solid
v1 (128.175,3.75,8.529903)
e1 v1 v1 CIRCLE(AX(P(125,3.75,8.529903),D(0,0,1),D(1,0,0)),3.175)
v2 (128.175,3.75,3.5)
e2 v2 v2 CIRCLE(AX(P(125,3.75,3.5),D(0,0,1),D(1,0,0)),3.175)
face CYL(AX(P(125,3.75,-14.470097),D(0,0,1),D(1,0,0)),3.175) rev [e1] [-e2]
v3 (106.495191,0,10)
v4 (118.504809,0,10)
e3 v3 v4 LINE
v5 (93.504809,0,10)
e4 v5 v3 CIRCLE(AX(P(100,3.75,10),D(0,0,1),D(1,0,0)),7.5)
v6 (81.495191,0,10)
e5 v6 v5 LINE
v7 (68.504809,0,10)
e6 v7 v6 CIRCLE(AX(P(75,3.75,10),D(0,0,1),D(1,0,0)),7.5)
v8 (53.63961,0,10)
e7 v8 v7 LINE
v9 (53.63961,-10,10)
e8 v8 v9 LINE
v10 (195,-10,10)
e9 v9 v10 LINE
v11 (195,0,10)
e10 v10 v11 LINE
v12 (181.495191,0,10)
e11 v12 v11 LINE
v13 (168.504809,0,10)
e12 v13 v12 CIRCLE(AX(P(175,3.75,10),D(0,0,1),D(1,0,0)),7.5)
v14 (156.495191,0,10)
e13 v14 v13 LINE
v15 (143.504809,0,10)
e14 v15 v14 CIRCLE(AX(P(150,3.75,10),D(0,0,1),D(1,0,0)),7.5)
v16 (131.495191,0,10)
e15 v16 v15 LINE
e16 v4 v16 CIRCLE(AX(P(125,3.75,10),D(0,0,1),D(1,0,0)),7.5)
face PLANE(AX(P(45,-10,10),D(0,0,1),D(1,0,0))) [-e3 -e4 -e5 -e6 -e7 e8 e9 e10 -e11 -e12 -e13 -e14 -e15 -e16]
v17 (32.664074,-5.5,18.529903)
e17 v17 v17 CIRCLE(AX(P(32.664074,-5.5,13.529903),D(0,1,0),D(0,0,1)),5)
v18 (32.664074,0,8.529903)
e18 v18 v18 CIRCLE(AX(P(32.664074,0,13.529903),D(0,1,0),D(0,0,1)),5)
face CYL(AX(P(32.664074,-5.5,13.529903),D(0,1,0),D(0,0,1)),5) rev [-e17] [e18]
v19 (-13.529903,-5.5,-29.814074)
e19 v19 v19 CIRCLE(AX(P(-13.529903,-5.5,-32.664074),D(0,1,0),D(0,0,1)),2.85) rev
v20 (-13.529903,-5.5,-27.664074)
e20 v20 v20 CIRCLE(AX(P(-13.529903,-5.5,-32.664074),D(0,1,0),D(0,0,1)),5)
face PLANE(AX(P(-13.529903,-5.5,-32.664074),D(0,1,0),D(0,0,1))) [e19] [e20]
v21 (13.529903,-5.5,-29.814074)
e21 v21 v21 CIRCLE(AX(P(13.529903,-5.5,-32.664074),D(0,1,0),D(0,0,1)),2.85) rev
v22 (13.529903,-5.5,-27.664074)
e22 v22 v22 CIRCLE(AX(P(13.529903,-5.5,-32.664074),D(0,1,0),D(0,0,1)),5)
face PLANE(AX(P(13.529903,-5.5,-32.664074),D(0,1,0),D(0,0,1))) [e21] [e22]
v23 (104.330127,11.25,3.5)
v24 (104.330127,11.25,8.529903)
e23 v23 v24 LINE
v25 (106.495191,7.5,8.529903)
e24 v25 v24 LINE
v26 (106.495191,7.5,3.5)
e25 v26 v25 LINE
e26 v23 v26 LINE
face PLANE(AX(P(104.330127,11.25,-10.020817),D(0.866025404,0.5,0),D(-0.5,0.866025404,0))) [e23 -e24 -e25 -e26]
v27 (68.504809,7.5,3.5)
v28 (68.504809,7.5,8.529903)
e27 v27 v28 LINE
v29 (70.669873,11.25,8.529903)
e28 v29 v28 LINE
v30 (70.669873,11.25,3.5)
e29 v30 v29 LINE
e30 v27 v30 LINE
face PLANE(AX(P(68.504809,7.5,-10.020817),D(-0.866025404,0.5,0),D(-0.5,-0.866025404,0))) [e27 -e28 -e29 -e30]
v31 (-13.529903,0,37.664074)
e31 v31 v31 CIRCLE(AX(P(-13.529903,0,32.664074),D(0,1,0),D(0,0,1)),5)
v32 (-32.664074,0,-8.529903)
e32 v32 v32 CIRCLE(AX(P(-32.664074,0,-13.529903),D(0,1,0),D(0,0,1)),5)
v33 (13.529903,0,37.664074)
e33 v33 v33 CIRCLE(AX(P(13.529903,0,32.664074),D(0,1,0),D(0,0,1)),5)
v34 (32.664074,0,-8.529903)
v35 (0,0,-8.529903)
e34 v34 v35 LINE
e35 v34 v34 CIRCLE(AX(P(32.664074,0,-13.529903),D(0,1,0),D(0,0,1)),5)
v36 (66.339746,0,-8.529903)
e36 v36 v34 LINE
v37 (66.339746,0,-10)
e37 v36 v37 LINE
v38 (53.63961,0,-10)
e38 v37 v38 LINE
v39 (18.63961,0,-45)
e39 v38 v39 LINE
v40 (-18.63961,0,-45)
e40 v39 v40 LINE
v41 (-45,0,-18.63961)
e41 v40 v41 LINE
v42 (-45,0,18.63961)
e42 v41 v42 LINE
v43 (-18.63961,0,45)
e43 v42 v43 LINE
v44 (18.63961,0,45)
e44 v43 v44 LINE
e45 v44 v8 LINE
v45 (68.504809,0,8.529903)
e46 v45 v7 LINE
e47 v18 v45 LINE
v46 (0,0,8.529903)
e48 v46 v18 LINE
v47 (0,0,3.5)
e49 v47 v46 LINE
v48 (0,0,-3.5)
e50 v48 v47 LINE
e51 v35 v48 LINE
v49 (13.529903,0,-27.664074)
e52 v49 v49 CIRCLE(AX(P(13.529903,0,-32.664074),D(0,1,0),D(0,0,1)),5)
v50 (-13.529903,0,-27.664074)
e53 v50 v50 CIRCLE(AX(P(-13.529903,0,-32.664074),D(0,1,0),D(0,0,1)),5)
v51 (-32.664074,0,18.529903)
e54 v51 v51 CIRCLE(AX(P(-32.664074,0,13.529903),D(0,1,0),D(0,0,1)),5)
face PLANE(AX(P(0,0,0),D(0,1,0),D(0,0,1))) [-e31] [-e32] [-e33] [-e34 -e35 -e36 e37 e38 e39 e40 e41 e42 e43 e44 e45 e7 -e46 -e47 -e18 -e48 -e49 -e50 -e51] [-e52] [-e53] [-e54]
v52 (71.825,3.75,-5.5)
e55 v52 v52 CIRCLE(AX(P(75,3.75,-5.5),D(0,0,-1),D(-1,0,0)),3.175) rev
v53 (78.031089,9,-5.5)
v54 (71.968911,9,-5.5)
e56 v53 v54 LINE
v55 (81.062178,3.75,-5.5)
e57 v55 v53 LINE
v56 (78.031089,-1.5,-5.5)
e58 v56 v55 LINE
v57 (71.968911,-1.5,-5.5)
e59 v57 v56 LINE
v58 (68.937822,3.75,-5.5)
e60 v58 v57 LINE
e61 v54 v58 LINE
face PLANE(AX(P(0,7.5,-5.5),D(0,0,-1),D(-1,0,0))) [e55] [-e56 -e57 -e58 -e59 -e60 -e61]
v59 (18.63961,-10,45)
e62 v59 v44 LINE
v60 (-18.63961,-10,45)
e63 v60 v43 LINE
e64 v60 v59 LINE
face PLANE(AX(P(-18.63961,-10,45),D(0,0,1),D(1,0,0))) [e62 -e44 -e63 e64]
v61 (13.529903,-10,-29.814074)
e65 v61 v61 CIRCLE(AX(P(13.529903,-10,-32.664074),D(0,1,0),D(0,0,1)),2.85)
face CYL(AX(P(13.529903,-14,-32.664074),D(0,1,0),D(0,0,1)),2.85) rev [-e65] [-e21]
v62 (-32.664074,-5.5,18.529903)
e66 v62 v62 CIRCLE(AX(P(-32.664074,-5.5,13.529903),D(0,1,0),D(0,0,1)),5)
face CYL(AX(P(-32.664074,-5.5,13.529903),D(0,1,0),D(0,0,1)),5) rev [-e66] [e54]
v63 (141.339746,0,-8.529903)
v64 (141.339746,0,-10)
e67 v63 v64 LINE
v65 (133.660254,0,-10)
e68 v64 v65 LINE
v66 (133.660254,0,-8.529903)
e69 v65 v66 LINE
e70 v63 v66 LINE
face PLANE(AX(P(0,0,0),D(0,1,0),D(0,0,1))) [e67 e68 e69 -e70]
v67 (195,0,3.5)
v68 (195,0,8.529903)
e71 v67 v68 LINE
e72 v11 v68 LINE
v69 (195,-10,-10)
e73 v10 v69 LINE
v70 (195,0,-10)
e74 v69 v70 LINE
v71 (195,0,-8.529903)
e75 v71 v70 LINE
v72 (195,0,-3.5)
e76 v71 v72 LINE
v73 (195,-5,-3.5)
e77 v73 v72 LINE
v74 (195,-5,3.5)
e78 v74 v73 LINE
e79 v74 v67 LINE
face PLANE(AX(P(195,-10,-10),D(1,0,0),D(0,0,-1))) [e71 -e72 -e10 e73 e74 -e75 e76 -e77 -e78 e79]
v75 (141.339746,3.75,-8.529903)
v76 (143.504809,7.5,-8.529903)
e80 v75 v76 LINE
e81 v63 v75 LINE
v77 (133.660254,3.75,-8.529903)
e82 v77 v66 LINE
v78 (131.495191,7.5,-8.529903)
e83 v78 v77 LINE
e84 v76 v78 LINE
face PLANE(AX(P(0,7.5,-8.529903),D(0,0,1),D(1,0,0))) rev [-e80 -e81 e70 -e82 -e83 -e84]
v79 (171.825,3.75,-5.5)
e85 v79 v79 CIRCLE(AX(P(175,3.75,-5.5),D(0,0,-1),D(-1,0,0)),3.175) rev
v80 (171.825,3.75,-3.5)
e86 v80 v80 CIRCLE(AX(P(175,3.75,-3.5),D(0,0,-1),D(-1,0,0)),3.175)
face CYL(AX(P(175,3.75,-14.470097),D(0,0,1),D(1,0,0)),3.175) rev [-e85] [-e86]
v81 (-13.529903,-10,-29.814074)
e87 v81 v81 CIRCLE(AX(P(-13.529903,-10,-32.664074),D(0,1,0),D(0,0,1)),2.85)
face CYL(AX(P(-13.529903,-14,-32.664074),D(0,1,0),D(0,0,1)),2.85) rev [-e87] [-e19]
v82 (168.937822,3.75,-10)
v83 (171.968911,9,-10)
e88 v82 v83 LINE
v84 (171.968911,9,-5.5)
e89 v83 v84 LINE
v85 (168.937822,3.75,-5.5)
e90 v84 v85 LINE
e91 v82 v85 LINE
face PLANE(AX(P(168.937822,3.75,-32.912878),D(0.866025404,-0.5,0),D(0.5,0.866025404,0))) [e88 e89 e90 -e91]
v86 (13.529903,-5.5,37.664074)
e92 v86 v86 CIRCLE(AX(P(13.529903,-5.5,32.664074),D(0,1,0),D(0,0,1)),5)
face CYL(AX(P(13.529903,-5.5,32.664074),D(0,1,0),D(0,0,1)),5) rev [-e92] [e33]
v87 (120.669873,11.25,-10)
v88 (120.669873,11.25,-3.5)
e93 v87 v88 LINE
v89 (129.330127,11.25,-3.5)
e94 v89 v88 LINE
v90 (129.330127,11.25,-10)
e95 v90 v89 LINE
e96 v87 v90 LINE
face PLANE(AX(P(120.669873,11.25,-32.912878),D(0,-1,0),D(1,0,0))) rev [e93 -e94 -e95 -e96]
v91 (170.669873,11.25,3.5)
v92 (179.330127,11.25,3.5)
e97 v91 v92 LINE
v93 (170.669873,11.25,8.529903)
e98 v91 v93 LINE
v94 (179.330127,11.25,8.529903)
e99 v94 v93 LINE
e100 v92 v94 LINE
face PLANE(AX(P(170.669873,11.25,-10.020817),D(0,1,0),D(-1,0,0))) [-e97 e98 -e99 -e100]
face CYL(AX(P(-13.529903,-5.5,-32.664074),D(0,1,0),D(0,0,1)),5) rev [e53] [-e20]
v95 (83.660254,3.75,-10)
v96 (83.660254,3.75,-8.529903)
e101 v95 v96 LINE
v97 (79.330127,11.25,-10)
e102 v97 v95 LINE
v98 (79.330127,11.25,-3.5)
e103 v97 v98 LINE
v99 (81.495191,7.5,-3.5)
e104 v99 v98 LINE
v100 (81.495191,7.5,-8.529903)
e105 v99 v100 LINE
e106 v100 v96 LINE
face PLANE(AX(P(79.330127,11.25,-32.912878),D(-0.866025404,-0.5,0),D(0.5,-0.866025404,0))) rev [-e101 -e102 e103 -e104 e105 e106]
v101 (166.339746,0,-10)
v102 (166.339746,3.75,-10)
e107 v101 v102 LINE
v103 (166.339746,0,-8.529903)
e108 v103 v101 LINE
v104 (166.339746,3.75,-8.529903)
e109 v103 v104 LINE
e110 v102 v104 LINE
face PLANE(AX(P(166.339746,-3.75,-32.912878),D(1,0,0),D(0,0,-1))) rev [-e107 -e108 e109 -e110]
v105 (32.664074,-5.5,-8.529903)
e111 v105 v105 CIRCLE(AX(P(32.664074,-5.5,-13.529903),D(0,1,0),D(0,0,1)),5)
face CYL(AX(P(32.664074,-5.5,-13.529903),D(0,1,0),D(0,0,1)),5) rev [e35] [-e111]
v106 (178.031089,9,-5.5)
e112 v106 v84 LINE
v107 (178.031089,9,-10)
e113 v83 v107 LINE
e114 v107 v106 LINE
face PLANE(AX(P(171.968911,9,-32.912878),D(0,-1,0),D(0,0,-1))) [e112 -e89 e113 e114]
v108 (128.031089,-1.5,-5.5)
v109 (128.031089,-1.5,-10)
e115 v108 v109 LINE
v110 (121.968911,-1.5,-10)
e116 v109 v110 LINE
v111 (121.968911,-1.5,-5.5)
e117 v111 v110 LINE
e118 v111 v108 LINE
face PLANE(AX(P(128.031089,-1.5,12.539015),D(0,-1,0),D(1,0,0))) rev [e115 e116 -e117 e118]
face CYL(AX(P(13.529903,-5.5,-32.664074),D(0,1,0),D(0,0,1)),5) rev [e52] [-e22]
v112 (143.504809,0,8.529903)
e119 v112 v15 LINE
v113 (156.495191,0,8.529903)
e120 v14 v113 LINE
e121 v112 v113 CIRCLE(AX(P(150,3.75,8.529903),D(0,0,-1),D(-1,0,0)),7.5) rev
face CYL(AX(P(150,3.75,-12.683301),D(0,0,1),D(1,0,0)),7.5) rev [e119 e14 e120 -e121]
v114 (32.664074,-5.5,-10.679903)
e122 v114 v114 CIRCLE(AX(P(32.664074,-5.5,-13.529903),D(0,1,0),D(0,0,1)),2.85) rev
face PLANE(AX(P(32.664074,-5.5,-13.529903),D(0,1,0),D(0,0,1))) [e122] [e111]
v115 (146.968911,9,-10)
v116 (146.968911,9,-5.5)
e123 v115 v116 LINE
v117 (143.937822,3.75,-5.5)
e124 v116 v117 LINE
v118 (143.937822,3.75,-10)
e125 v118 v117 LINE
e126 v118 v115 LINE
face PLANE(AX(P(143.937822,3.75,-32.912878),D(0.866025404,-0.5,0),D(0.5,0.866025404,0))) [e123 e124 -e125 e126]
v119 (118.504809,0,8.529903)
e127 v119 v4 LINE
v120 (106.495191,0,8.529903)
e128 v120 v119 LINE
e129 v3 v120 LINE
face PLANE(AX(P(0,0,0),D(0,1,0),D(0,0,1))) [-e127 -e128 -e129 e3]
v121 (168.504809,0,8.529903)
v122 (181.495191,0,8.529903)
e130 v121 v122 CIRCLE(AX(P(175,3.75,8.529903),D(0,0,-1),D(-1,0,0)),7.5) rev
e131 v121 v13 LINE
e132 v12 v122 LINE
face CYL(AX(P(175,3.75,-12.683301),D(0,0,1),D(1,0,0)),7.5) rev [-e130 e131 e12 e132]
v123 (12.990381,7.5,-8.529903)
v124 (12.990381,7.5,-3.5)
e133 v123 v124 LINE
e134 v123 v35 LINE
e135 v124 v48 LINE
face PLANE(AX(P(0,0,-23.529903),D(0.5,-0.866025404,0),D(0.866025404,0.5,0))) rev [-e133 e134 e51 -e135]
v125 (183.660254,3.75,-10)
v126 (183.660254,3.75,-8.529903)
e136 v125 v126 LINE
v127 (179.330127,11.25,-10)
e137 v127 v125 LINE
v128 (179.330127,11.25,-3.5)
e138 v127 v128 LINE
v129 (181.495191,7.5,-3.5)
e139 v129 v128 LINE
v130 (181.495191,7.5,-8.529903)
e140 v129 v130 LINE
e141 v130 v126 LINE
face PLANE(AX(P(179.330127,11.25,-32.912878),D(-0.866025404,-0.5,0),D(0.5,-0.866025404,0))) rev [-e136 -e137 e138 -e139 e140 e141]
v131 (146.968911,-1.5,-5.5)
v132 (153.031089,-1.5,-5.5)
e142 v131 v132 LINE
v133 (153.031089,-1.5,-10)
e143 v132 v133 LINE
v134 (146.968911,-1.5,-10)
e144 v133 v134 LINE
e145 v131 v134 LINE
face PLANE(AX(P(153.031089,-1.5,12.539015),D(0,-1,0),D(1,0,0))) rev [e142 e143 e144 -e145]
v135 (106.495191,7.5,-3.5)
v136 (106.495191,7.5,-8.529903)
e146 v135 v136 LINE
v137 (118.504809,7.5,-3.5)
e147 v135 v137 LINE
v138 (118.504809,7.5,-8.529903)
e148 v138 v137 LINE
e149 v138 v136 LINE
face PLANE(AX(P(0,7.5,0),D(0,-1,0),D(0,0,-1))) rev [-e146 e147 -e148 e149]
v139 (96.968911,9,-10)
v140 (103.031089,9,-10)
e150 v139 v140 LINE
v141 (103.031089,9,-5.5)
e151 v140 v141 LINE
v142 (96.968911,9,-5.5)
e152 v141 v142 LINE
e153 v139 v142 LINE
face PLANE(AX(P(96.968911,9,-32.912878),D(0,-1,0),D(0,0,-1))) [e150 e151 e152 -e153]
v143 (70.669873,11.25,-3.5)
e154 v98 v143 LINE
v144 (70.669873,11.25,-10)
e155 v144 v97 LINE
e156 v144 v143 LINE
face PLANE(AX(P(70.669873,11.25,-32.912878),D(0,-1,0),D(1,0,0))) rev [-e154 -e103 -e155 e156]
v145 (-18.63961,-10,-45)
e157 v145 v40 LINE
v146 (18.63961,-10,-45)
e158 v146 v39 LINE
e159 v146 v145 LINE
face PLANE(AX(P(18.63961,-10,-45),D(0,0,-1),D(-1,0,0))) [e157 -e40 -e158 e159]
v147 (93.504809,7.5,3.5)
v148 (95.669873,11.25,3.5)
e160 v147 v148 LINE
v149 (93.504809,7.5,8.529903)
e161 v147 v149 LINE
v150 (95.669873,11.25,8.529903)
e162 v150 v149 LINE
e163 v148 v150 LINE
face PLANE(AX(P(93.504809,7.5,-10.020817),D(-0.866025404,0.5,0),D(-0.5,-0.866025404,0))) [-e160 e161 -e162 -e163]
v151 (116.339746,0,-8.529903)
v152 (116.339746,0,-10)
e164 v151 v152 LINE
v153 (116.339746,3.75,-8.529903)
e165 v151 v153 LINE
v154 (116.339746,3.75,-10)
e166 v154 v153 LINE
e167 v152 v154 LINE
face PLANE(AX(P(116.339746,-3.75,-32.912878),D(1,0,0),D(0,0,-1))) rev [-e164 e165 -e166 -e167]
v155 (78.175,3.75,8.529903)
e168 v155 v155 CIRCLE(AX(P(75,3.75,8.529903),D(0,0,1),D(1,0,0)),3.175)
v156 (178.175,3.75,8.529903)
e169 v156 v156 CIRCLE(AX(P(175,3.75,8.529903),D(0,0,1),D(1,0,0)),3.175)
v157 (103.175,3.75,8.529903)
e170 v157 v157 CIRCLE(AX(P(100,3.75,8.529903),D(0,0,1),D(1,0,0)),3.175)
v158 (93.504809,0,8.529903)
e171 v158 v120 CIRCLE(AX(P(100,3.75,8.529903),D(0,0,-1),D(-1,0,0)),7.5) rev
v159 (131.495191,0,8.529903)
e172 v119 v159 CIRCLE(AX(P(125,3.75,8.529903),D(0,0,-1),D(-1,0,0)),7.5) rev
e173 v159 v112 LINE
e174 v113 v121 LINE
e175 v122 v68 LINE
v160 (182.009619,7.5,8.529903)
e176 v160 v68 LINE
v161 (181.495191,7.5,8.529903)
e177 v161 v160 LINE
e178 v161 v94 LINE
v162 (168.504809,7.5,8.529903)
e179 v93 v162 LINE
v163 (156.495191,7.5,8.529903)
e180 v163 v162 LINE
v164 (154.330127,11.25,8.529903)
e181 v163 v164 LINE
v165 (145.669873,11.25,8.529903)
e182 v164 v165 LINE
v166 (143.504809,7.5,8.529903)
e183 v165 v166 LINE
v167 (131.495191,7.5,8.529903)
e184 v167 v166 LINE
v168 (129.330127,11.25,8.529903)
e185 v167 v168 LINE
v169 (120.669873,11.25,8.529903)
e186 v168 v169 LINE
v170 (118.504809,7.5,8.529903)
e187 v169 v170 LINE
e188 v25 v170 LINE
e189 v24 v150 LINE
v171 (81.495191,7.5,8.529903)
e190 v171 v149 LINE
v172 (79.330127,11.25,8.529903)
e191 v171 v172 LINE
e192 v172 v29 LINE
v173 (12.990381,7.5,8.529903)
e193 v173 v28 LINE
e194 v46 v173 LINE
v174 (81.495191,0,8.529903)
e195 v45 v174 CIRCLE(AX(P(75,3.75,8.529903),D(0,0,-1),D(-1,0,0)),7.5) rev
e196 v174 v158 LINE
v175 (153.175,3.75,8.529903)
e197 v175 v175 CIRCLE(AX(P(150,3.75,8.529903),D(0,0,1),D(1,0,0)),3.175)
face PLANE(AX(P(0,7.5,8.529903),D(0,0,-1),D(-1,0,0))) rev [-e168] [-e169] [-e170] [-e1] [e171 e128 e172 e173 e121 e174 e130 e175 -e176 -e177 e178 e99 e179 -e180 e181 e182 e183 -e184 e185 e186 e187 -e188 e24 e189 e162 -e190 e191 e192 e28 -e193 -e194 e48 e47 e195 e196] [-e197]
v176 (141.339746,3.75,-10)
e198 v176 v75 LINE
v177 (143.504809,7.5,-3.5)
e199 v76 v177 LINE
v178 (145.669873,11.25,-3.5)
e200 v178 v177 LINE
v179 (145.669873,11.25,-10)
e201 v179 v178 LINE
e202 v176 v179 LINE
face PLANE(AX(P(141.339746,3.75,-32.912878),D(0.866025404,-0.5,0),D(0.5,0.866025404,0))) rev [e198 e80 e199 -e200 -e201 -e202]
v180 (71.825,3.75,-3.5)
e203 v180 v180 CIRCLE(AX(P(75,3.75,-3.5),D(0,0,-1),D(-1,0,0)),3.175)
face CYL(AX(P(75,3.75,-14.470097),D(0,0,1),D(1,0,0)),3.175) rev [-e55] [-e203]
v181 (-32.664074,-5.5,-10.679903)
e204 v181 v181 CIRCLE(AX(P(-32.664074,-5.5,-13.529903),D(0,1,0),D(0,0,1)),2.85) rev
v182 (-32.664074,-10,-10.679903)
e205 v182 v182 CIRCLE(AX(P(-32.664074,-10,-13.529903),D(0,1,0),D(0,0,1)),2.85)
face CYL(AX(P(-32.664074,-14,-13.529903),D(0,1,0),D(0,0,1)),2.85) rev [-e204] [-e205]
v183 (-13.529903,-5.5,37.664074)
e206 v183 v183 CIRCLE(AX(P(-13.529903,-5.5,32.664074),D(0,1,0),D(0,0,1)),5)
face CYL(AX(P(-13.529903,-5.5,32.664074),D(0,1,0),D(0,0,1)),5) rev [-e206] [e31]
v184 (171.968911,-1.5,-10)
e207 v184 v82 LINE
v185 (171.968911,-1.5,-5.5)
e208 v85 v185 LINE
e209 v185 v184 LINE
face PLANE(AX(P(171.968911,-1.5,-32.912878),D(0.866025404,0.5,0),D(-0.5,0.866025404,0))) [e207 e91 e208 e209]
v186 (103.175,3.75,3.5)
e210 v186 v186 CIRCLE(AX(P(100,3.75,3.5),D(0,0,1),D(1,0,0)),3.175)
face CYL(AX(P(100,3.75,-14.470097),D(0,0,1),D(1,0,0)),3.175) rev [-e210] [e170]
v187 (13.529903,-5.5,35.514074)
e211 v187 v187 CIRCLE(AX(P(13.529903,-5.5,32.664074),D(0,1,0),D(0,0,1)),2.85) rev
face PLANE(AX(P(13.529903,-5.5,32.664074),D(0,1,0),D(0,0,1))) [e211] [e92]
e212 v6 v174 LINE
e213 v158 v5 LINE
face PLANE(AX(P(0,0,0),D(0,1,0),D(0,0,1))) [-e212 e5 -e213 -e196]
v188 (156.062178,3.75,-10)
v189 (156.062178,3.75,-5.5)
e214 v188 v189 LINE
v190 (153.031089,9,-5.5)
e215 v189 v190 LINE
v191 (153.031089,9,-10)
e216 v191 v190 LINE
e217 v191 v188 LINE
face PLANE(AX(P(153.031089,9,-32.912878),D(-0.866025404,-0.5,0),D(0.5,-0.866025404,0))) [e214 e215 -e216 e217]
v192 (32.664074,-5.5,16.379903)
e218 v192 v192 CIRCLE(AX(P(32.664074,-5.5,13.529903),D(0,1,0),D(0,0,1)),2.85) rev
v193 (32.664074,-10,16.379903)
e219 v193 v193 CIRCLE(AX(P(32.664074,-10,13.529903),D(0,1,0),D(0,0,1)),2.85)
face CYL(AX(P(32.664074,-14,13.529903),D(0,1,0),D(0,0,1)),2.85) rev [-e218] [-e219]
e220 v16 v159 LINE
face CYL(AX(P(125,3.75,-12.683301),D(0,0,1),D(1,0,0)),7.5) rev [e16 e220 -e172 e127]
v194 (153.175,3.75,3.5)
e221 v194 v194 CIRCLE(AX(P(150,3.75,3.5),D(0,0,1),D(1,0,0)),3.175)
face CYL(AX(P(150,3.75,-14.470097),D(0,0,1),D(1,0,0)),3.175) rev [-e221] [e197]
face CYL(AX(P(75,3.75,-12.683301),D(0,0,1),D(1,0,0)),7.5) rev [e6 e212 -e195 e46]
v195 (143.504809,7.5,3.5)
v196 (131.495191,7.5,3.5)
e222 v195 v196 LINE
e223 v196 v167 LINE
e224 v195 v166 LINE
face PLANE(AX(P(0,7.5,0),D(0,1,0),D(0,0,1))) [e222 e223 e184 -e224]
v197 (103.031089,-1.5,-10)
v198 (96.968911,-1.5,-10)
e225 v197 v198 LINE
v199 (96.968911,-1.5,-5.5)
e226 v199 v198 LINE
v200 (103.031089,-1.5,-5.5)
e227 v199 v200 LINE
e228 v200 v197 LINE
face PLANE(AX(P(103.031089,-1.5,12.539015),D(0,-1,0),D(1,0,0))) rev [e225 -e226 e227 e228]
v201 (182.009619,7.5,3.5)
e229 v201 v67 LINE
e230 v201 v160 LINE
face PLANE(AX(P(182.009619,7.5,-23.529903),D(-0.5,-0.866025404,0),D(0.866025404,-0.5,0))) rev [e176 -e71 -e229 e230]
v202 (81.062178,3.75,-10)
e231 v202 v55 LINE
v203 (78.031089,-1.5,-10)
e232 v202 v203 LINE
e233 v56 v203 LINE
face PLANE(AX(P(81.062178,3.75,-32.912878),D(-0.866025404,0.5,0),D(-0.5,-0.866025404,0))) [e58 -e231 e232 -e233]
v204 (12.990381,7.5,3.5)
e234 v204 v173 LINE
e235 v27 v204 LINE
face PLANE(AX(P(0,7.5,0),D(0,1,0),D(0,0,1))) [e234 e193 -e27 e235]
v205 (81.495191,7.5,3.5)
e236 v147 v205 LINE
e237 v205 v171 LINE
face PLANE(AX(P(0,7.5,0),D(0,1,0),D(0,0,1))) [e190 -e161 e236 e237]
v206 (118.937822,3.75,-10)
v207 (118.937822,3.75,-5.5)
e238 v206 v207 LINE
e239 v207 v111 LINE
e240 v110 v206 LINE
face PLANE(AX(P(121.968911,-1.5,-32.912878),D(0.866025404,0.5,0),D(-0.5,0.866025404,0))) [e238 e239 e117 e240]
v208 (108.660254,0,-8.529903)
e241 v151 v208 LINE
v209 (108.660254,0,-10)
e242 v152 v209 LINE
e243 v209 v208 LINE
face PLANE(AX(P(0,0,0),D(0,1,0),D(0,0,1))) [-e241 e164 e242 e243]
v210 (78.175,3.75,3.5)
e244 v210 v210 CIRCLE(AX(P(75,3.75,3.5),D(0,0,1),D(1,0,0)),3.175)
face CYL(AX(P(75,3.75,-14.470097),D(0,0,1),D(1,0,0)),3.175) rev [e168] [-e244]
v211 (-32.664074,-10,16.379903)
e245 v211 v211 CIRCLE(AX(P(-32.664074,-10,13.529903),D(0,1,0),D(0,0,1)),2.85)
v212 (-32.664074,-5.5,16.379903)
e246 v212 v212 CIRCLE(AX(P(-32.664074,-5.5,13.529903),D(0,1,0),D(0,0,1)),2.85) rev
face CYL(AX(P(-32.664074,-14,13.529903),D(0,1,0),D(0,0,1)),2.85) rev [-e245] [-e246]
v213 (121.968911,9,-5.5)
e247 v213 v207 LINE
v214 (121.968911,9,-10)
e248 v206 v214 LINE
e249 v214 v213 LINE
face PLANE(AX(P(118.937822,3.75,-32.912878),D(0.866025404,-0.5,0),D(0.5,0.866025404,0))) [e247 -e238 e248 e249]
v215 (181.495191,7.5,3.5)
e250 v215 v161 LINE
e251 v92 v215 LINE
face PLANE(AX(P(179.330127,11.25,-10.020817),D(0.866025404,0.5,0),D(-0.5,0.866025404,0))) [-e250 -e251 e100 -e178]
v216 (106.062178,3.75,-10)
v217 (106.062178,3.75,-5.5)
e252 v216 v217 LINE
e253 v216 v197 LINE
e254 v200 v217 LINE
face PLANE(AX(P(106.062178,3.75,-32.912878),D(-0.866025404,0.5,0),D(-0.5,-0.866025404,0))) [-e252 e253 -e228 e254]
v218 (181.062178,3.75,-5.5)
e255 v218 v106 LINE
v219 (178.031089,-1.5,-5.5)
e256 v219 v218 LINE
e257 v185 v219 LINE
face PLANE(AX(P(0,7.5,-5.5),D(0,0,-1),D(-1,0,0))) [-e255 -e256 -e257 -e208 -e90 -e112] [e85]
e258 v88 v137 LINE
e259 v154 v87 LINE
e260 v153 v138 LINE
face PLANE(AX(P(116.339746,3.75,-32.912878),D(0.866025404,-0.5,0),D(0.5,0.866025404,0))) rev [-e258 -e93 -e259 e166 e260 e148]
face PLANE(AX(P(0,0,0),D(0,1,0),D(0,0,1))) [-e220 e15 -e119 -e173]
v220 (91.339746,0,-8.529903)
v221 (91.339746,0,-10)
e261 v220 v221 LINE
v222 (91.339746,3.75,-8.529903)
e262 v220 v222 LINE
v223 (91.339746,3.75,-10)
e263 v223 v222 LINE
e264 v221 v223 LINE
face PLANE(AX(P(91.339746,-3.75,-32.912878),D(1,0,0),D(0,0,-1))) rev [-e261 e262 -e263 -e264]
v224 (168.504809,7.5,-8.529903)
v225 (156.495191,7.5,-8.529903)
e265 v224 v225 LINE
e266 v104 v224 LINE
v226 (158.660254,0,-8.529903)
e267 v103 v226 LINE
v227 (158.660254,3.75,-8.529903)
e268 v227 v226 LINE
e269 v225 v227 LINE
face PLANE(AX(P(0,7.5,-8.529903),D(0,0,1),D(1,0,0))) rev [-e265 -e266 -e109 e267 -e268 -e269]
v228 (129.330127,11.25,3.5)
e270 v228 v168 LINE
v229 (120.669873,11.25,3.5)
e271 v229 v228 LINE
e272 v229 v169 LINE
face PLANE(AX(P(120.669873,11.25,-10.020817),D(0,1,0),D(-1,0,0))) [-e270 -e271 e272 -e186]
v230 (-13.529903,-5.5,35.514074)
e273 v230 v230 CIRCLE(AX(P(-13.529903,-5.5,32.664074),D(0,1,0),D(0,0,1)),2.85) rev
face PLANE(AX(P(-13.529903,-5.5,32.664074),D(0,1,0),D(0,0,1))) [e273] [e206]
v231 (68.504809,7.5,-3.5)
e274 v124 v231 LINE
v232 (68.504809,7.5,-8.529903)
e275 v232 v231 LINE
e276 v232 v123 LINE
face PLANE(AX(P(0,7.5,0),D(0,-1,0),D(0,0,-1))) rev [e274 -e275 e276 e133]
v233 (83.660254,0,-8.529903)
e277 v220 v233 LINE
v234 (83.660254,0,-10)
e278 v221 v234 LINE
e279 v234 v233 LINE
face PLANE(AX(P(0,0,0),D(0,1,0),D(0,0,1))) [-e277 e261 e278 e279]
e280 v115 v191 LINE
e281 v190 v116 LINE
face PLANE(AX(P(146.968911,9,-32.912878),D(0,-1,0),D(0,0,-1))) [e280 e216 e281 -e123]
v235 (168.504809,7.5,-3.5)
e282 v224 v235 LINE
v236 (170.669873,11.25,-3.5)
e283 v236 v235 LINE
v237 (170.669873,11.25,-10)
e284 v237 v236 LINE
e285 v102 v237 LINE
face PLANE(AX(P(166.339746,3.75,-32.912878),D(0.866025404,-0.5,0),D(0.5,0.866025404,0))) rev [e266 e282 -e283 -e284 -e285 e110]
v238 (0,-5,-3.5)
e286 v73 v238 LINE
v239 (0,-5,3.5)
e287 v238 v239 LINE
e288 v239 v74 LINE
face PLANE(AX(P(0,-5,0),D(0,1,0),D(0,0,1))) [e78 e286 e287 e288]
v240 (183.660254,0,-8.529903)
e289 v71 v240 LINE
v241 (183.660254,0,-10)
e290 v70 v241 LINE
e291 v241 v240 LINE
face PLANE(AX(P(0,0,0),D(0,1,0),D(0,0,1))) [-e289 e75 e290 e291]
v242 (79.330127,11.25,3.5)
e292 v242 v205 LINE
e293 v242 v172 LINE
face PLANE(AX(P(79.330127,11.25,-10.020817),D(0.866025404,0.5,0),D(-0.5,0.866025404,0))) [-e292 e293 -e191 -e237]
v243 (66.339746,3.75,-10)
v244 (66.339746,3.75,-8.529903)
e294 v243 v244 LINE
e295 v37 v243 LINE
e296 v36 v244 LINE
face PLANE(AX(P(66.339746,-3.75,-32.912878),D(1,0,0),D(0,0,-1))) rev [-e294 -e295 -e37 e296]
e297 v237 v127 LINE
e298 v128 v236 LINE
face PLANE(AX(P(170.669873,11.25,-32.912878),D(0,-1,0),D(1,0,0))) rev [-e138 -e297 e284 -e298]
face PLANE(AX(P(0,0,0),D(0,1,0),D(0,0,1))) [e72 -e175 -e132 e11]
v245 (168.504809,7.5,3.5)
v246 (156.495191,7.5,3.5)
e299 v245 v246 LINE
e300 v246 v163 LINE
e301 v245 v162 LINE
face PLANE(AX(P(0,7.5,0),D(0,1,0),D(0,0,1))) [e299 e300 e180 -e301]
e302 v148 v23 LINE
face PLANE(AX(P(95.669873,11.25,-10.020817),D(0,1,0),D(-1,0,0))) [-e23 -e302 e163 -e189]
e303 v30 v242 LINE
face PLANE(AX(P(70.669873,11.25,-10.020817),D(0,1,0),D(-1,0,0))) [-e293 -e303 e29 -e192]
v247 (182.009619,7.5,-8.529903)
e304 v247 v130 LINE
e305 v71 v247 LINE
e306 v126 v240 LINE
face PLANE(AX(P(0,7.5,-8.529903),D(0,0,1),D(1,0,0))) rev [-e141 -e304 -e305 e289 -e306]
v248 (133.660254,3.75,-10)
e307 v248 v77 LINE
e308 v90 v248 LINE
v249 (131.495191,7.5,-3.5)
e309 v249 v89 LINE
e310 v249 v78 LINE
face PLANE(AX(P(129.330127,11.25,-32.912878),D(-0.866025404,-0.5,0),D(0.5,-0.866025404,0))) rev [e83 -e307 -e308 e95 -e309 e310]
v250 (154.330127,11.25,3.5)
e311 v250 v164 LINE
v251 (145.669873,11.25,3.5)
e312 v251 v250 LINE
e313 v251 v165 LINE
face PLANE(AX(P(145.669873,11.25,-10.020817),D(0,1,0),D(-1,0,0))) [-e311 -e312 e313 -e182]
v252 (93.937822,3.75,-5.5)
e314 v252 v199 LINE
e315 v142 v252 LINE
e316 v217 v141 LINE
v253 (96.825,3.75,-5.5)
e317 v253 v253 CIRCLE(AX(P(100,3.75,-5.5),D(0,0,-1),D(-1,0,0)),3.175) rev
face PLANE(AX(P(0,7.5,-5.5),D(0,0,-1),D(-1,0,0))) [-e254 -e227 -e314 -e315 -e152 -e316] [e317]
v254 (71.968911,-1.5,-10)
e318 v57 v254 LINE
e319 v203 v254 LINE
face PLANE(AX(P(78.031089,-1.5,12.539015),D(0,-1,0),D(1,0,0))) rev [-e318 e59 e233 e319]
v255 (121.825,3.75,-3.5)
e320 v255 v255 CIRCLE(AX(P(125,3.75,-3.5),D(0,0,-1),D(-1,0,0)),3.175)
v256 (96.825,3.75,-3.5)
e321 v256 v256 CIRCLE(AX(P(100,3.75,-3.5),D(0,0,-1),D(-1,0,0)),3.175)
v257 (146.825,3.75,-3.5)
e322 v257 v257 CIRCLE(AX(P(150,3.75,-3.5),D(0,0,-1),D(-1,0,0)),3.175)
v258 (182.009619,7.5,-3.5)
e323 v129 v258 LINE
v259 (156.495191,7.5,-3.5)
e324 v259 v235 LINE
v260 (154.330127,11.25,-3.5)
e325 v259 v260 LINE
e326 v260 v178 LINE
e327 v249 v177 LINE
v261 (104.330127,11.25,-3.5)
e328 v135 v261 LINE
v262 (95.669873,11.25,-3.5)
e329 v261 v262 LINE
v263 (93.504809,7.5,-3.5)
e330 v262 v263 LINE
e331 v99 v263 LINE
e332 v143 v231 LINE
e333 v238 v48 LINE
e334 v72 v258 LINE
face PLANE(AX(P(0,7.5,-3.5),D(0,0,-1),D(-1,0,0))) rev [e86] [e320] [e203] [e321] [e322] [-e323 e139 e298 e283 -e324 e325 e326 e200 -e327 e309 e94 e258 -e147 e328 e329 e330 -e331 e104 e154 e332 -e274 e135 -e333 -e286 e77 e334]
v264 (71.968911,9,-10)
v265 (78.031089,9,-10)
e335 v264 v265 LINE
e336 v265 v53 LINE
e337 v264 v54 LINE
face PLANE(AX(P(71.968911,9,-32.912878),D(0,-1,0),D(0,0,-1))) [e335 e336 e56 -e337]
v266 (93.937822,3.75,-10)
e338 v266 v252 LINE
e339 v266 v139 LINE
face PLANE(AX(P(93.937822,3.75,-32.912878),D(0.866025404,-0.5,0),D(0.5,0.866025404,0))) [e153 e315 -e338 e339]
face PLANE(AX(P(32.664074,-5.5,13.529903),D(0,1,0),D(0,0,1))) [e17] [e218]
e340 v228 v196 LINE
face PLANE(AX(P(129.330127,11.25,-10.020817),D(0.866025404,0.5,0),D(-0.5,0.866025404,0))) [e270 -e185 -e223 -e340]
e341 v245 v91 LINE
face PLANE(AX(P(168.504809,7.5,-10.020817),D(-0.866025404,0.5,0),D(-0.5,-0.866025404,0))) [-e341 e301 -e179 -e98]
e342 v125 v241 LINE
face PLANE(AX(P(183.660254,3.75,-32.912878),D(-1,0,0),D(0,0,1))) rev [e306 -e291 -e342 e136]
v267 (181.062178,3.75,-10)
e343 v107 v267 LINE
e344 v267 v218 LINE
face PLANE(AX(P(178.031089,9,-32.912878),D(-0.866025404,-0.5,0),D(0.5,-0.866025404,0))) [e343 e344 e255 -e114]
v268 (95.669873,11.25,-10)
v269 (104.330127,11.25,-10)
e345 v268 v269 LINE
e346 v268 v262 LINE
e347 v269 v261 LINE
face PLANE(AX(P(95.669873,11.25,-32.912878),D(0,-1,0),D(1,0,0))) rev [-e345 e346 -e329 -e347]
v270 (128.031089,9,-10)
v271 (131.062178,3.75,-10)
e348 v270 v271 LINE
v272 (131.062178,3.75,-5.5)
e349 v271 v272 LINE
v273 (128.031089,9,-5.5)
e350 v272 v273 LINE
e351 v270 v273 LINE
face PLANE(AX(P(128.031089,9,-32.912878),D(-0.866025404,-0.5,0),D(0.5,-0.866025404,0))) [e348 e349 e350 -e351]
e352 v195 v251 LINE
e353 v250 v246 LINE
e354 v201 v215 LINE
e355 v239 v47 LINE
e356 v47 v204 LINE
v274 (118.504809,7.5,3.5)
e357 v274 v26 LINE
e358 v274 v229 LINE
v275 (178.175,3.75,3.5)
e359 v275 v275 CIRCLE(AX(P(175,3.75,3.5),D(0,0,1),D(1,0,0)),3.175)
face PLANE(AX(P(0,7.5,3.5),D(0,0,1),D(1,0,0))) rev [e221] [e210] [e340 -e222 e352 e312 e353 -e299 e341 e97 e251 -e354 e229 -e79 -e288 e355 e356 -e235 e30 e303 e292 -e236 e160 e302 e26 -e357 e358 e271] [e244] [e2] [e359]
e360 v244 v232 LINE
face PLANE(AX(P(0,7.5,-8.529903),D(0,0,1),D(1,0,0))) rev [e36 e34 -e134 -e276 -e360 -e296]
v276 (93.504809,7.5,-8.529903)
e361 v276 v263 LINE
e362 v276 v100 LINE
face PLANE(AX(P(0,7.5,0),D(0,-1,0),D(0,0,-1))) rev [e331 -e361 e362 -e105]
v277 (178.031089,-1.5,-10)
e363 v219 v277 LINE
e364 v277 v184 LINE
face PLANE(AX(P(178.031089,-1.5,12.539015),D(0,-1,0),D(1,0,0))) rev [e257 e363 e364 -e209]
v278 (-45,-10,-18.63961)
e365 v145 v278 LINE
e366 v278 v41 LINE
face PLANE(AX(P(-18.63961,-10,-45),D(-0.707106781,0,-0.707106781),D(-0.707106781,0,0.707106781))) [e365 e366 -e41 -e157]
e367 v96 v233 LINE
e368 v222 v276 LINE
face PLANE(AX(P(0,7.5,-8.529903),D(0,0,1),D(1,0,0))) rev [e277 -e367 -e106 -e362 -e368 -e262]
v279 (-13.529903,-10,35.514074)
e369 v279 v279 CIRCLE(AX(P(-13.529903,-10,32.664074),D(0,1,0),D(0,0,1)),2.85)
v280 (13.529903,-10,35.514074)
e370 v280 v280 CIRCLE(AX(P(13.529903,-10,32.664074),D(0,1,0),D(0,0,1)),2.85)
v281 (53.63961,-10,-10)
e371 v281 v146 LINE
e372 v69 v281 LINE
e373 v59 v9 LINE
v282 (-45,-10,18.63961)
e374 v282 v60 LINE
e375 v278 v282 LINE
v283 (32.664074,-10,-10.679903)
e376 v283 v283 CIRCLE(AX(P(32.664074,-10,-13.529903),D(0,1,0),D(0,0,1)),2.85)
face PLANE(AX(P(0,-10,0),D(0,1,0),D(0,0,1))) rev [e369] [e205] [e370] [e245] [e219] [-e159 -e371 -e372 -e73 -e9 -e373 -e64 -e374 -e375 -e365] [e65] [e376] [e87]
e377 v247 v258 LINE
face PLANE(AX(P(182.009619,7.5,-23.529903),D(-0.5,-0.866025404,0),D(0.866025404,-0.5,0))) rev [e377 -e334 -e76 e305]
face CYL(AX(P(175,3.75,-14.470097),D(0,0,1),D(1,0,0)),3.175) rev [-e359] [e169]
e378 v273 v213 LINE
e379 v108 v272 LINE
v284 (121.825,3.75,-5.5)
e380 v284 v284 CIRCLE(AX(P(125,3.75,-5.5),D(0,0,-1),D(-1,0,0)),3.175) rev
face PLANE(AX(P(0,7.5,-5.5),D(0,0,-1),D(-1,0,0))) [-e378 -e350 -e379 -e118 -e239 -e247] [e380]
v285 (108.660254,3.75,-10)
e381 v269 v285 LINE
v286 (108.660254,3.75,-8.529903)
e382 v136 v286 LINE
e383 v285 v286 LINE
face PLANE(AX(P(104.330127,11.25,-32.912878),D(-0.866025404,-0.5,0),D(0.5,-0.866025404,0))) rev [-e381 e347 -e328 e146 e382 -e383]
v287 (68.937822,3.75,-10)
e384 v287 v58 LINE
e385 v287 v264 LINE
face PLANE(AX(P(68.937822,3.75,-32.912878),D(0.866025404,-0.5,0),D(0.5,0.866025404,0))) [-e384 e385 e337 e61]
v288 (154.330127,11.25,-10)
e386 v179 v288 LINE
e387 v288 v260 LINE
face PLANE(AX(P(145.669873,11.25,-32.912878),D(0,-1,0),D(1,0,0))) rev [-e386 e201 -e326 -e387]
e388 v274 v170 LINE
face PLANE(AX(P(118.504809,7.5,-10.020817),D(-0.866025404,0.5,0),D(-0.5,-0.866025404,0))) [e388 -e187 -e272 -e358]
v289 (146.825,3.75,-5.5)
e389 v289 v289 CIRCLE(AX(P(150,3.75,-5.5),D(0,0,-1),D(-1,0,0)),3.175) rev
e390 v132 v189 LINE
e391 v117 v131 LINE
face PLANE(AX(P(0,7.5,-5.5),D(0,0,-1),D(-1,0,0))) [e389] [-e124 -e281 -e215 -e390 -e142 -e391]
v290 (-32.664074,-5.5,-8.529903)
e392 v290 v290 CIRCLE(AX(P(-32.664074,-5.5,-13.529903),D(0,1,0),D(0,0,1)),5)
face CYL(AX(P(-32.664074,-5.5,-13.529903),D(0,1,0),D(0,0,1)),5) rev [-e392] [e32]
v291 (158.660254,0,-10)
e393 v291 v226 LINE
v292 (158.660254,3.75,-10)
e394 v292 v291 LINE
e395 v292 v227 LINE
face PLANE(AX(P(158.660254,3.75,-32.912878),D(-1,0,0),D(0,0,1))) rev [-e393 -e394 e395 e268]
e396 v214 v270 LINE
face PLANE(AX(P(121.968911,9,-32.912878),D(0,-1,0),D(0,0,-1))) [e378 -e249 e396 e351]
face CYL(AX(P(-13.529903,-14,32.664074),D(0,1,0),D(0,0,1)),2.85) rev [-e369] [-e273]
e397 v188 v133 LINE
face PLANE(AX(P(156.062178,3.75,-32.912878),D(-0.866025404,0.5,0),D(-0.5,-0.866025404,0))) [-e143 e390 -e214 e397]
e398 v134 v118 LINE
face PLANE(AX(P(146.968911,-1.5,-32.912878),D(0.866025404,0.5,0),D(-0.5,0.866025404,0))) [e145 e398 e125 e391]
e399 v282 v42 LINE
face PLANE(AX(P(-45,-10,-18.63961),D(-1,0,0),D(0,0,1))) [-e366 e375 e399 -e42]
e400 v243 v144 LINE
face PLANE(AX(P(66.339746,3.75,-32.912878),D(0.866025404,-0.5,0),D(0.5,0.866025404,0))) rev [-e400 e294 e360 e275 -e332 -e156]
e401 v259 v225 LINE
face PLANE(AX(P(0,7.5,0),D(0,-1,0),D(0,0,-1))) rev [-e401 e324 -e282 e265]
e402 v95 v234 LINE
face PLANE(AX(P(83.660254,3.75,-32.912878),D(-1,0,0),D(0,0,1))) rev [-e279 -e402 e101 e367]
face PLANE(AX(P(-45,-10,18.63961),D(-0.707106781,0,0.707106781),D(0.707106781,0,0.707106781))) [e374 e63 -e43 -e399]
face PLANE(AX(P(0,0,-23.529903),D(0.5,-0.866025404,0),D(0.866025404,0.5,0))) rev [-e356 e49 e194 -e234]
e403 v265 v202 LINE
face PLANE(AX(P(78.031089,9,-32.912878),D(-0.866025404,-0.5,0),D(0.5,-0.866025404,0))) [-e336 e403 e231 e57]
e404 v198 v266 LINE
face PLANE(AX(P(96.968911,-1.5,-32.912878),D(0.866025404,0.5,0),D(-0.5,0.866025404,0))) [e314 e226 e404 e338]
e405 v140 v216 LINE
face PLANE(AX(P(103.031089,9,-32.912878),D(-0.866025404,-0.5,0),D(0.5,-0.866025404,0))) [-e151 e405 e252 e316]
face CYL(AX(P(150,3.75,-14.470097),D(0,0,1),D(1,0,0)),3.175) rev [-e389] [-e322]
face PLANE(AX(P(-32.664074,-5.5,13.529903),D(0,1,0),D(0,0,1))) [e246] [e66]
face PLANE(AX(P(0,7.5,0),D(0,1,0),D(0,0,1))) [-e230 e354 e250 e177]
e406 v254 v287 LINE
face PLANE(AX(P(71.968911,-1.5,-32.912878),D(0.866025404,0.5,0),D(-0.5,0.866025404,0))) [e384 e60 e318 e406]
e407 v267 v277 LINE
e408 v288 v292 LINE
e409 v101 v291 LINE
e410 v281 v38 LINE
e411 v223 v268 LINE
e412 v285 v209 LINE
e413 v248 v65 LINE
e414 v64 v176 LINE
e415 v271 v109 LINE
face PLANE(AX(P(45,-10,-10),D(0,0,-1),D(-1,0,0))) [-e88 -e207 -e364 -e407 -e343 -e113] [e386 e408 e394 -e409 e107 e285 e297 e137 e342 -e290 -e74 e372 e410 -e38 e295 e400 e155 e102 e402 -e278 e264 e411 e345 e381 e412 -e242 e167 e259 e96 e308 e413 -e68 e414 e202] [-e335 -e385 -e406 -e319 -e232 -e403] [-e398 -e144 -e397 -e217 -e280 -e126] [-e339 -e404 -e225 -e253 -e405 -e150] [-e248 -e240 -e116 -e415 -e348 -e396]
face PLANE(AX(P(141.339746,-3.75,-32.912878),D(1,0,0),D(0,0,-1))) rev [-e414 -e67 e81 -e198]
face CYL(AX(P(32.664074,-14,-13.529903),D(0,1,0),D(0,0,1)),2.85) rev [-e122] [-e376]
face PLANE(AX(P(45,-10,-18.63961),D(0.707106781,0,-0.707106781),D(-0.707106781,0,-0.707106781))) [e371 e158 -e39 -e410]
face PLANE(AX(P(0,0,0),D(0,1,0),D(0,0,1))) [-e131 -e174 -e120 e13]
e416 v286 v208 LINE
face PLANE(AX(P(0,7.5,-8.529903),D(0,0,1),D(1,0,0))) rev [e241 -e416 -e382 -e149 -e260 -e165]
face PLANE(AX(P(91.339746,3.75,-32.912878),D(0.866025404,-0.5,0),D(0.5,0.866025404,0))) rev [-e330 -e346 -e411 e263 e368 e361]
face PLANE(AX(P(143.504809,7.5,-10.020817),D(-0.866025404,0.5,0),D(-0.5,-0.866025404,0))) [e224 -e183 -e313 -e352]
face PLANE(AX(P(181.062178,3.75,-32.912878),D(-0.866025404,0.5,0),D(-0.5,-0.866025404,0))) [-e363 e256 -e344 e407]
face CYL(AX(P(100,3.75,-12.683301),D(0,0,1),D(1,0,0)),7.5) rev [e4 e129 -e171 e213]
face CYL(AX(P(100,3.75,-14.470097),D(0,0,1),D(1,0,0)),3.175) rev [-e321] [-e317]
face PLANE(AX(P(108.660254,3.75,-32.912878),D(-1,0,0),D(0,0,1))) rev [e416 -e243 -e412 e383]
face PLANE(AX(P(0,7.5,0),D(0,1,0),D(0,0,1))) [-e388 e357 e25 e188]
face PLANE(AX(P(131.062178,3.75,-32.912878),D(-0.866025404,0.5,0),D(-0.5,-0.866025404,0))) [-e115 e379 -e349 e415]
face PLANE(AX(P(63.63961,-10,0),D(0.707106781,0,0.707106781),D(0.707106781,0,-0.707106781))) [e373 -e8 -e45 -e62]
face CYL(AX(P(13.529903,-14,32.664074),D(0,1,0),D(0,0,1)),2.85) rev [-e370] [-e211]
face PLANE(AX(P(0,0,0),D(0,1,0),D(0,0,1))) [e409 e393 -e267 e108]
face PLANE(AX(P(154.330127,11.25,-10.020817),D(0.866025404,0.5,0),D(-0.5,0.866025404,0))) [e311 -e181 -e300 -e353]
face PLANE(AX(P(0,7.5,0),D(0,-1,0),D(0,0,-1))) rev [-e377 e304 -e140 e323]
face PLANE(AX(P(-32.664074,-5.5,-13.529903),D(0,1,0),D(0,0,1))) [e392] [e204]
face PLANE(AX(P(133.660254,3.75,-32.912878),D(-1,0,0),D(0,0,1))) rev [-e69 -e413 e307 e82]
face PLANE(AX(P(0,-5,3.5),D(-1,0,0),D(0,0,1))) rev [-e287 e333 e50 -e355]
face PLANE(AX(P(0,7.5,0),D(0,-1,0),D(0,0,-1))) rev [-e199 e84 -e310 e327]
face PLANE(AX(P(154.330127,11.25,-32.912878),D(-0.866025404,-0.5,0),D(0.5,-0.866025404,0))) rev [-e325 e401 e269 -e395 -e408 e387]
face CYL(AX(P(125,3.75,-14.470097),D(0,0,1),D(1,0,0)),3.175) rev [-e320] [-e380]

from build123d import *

# Parameters (mm, degrees)
BOSS_EXTRUDE1_DEPTH             = 10
SKETCH2_R                       = 2.85
CUT_EXTRUDE1_DEPTH              = 14
SKETCH5_R                       = 5
CUT_EXTRUDE2_DEPTH              = 5.5
SKETCH7_W                       = 150
SKETCH7_H                       = 20
BOSS_EXTRUDE3_DEPTH             = 10
SKETCH8_W                       = 195
SKETCH8_H                       = 5.029902504
BOSS_EXTRUDE4_DEPTH             = 7.5
BOSS_EXTRUDE5_REACH             = 204.461
BOSS_EXTRUDE5_DIRECTION_2_REACH = 204.461
CUT_EXTRUDE3_REACH              = 204.527
SKETCH10_W                      = 195
SKETCH10_H                      = 7
CUT_EXTRUDE4_DEPTH              = 5
SKETCH11_R                      = 3.175
CUT_EXTRUDE5_DEPTH              = 23
SKETCH12_R                      = 7.5
CUT_EXTRUDE6_DEPTH              = 1.470097496
SKETCH14_W                      = 7.794228634
SKETCH14_H                      = 5.029902504
BOSS_EXTRUDE6_DEPTH             = 1.5
CUT_EXTRUDE7_DEPTH              = 4.5
BOSS_EXTRUDE7_DEPTH             = 5.029902504
LPATTERN4_COUNT                 = 5
LPATTERN4_PITCH                 = 25


with BuildPart() as part:
    # Sketch1 → Boss-Extrude1 (new body)
    with BuildSketch(Plane(origin=(0, 0, 0), x_dir=(1, 0, 0), z_dir=(0, 1, 0))):
        Polygon((45, 18.639610307), (63.639610307, 0), (45, -18.639610307), (18.639610307, -45), (-18.639610307, -45), (-45, -18.639610307), (-45, 18.639610307), (-18.639610307, 45), (18.639610307, 45), align=None)
    extrude(amount=-BOSS_EXTRUDE1_DEPTH)

    # Sketch2 → Cut-Extrude1 (cut)
    with BuildSketch(Plane(origin=(0, 0, 0), x_dir=(1, 0, 0), z_dir=(0, 1, 0))):
        with Locations(Location((-32.664074122, -13.529902504, 0), (0, 0, 270))):
            Circle(SKETCH2_R)
        with Locations(Location((-32.664074122, 13.529902504, 0), (0, 0, 270))):
            Circle(SKETCH2_R)
        with Locations(Location((-13.529902504, 32.664074122, 0), (0, 0, 270))):
            Circle(SKETCH2_R)
        with Locations(Location((13.529902504, 32.664074122, 0), (0, 0, 270))):
            Circle(SKETCH2_R)
        with Locations(Location((32.664074122, 13.529902504, 0), (0, 0, 270))):
            Circle(SKETCH2_R)
        with Locations(Location((32.664074122, -13.529902504, 0), (0, 0, 270))):
            Circle(SKETCH2_R)
        with Locations(Location((13.529902504, -32.664074122, 0), (0, 0, 270))):
            Circle(SKETCH2_R)
        with Locations(Location((-13.529902504, -32.664074122, 0), (0, 0, 270))):
            Circle(SKETCH2_R)
    extrude(amount=-CUT_EXTRUDE1_DEPTH, mode=Mode.SUBTRACT)

    # Sketch5 → Cut-Extrude2 (cut)
    with BuildSketch(Plane(origin=(0, 0, 0), x_dir=(1, 0, 0), z_dir=(0, 1, 0))):
        with Locations(Location((-32.664074122, -13.529902504, 0), (0, 0, 270))):
            Circle(SKETCH5_R)
        with Locations(Location((-32.664074122, 13.529902504, 0), (0, 0, 270))):
            Circle(SKETCH5_R)
        with Locations(Location((-13.529902504, 32.664074122, 0), (0, 0, 270))):
            Circle(SKETCH5_R)
        with Locations(Location((13.529902504, 32.664074122, 0), (0, 0, 270))):
            Circle(SKETCH5_R)
        with Locations(Location((32.664074122, 13.529902504, 0), (0, 0, 270))):
            Circle(SKETCH5_R)
        with Locations(Location((32.664074122, -13.529902504, 0), (0, 0, 270))):
            Circle(SKETCH5_R)
        with Locations(Location((13.529902504, -32.664074122, 0), (0, 0, 270))):
            Circle(SKETCH5_R)
        with Locations(Location((-13.529902504, -32.664074122, 0), (0, 0, 270))):
            Circle(SKETCH5_R)
    extrude(amount=-CUT_EXTRUDE2_DEPTH, mode=Mode.SUBTRACT)

    # Sketch7 → Boss-Extrude3 (add)
    with BuildSketch(Plane(origin=(0, 0, 0), x_dir=(1, 0, 0), z_dir=(0, 1, 0))):
        with Locations((120, 0)):
            Rectangle(SKETCH7_W, SKETCH7_H)
    extrude(amount=-BOSS_EXTRUDE3_DEPTH)

    # Sketch8 → Boss-Extrude4 (add)
    with BuildSketch(Plane(origin=(0, 0, 0), x_dir=(1, 0, 0), z_dir=(0, 1, 0))):
        with Locations((97.5, -6.014951252)):
            Rectangle(SKETCH8_W, SKETCH8_H)
        with Locations((97.5, 6.014951252)):
            Rectangle(SKETCH8_W, SKETCH8_H)
    extrude(amount=BOSS_EXTRUDE4_DEPTH)

    # Boss-Extrude5: up to this face of the body (flat: up to its plane)
    boss_extrude5_end = Plane(part.part.faces().sort_by_distance((124.319805153, -5, -10))[0])
    # Sketch13 → Boss-Extrude5 (add, up to the picked face)
    with BuildSketch(Plane(origin=(0, 0, -8.529902504), x_dir=(-1, 0, 0), z_dir=(0, 0, -1)), mode=Mode.PRIVATE) as boss_extrude5_sk1:
        Polygon((-166.339745962, 3.75), (-170.669872981, 11.25), (-179.330127019, 11.25), (-183.660254038, 3.75), (-183.660254038, -3.75), (-166.339745962, -3.75), align=None)
        Polygon((-168.937822174, 3.75), (-171.968911087, 9), (-178.031088913, 9), (-181.062177826, 3.75), (-178.031088913, -1.5), (-171.968911087, -1.5), align=None, mode=Mode.SUBTRACT)
    boss_extrude5_tool1 = split(extrude(boss_extrude5_sk1.sketch, amount=BOSS_EXTRUDE5_REACH, mode=Mode.PRIVATE), bisect_by=boss_extrude5_end, keep=Keep.BOTH, mode=Mode.PRIVATE)
    boss_extrude5 = boss_extrude5_tool1.solids().sort_by(Axis((168.703241, 7.385436, -8.529903), (0, 0, -1)))[0]
    add(boss_extrude5)

    # Boss-Extrude5 direction 2: up to this face of the body (flat: up to its plane)
    boss_extrude5_direction_2_end = Plane(part.part.faces().sort_by_distance((97.5, 3.75, -3.5))[0])
    # Sketch13 → Boss-Extrude5 direction 2 (add, up to the picked face)
    with BuildSketch(Plane(origin=(0, 0, -8.529902504), x_dir=(-1, 0, 0), z_dir=(0, 0, -1)), mode=Mode.PRIVATE) as boss_extrude5_direction_2_sk1:
        Polygon((-166.339745962, 3.75), (-170.669872981, 11.25), (-179.330127019, 11.25), (-183.660254038, 3.75), (-183.660254038, -3.75), (-166.339745962, -3.75), align=None)
        Polygon((-168.937822174, 3.75), (-171.968911087, 9), (-178.031088913, 9), (-181.062177826, 3.75), (-178.031088913, -1.5), (-171.968911087, -1.5), align=None, mode=Mode.SUBTRACT)
    boss_extrude5_direction_2_tool1 = split(extrude(boss_extrude5_direction_2_sk1.sketch, amount=-BOSS_EXTRUDE5_DIRECTION_2_REACH, mode=Mode.PRIVATE), bisect_by=boss_extrude5_direction_2_end, keep=Keep.BOTH, mode=Mode.PRIVATE)
    boss_extrude5_direction_2 = boss_extrude5_direction_2_tool1.solids().sort_by(Axis((168.703241, 7.385436, -8.529903), (0, 0, 1)))[0]
    add(boss_extrude5_direction_2)

    # Cut-Extrude3: up to this face of the body (flat: up to its plane)
    cut_extrude3_end = Plane(part.part.faces().sort_by_distance((83.441968882, 3.75810856, -8.529902504))[0])
    # Sketch9 → Cut-Extrude3 (cut, up to the picked face)
    with BuildSketch(Plane.XY.offset(8.529902504), mode=Mode.PRIVATE) as cut_extrude3_sk1:
        Polygon((0, 0), (12.990381057, 7.5), (0, 7.5), align=None)
    cut_extrude3_tool1 = split(extrude(cut_extrude3_sk1.sketch, amount=-CUT_EXTRUDE3_REACH, mode=Mode.PRIVATE), bisect_by=cut_extrude3_end, keep=Keep.BOTH, mode=Mode.PRIVATE)
    # Sketch9 → Cut-Extrude3 (cut, up to the picked face)
    with BuildSketch(Plane.XY.offset(8.529902504), mode=Mode.PRIVATE) as cut_extrude3_sk2:
        Polygon((182.009618943, 7.5), (195, 0), (195, 7.5), align=None)
    cut_extrude3_tool2 = split(extrude(cut_extrude3_sk2.sketch, amount=-CUT_EXTRUDE3_REACH, mode=Mode.PRIVATE), bisect_by=cut_extrude3_end, keep=Keep.BOTH, mode=Mode.PRIVATE)
    add(cut_extrude3_tool1.solids().sort_by(Axis((4.330127, 5, 8.529903), (0, 0, -1)))[0], mode=Mode.SUBTRACT)
    add(cut_extrude3_tool2.solids().sort_by(Axis((190.669873, 5, 8.529903), (0, 0, -1)))[0], mode=Mode.SUBTRACT)

    # Sketch10 → Cut-Extrude4 (cut)
    with BuildSketch(Plane(origin=(0, 0, 0), x_dir=(1, 0, 0), z_dir=(0, 1, 0))):
        with Locations((97.5, 0)):
            Rectangle(SKETCH10_W, SKETCH10_H)
    extrude(amount=-CUT_EXTRUDE4_DEPTH, mode=Mode.SUBTRACT)

    # Sketch11 → Cut-Extrude5 (cut)
    with BuildSketch(Plane.XY.offset(8.529902504)):
        with Locations((175, 3.75)):
            Circle(SKETCH11_R)
    cut_extrude5 = extrude(amount=-CUT_EXTRUDE5_DEPTH, mode=Mode.SUBTRACT)

    # Sketch12 → Cut-Extrude6 (cut)
    with BuildSketch(Plane.XY.offset(10)):
        with Locations((175, 3.75)):
            Circle(SKETCH12_R)
    cut_extrude6 = extrude(amount=-CUT_EXTRUDE6_DEPTH, mode=Mode.SUBTRACT)

    # Sketch14 → Boss-Extrude6 (add)
    with BuildSketch(Plane(origin=(0, 7.5, 0), x_dir=(1, 0, 0), z_dir=(0, 1, 0))):
        with Locations((175, 6.014951252)):
            Rectangle(SKETCH14_W, SKETCH14_H)
    boss_extrude6 = extrude(amount=BOSS_EXTRUDE6_DEPTH)

    # Sketch15 → Cut-Extrude7 (cut)
    with BuildSketch(Plane(origin=(0, 0, -10), x_dir=(-1, 0, 0), z_dir=(0, 0, -1))):
        Polygon((-168.937822174, 3.75), (-171.968911087, 9), (-178.031088913, 9), (-181.062177826, 3.75), (-178.031088913, -1.5), (-171.968911087, -1.5), align=None)
    cut_extrude7 = extrude(amount=-CUT_EXTRUDE7_DEPTH, mode=Mode.SUBTRACT)

    # Sketch16 → Boss-Extrude7 (add)
    with BuildSketch(Plane.XY.offset(8.529902504)):
        Polygon((168.504809472, 7.5), (170.669872981, 11.25), (179.330127019, 11.25), (181.495190528, 7.5), align=None)
    boss_extrude7 = extrude(amount=-BOSS_EXTRUDE7_DEPTH)

    # LPattern4: Boss-Extrude5, Boss-Extrude5 direction 2, Cut-Extrude5, Cut-Extrude6, Boss-Extrude6, Cut-Extrude7, Boss-Extrude7 ×5
    with Locations(*[(-i * LPATTERN4_PITCH, 0, 0) for i in range(1, LPATTERN4_COUNT)]):
        add(boss_extrude5)
        add(boss_extrude5_direction_2)
        add(cut_extrude5, mode=Mode.SUBTRACT)
        add(cut_extrude6, mode=Mode.SUBTRACT)
        add(boss_extrude6)
        add(cut_extrude7, mode=Mode.SUBTRACT)
        add(boss_extrude7)


solid = part.part
